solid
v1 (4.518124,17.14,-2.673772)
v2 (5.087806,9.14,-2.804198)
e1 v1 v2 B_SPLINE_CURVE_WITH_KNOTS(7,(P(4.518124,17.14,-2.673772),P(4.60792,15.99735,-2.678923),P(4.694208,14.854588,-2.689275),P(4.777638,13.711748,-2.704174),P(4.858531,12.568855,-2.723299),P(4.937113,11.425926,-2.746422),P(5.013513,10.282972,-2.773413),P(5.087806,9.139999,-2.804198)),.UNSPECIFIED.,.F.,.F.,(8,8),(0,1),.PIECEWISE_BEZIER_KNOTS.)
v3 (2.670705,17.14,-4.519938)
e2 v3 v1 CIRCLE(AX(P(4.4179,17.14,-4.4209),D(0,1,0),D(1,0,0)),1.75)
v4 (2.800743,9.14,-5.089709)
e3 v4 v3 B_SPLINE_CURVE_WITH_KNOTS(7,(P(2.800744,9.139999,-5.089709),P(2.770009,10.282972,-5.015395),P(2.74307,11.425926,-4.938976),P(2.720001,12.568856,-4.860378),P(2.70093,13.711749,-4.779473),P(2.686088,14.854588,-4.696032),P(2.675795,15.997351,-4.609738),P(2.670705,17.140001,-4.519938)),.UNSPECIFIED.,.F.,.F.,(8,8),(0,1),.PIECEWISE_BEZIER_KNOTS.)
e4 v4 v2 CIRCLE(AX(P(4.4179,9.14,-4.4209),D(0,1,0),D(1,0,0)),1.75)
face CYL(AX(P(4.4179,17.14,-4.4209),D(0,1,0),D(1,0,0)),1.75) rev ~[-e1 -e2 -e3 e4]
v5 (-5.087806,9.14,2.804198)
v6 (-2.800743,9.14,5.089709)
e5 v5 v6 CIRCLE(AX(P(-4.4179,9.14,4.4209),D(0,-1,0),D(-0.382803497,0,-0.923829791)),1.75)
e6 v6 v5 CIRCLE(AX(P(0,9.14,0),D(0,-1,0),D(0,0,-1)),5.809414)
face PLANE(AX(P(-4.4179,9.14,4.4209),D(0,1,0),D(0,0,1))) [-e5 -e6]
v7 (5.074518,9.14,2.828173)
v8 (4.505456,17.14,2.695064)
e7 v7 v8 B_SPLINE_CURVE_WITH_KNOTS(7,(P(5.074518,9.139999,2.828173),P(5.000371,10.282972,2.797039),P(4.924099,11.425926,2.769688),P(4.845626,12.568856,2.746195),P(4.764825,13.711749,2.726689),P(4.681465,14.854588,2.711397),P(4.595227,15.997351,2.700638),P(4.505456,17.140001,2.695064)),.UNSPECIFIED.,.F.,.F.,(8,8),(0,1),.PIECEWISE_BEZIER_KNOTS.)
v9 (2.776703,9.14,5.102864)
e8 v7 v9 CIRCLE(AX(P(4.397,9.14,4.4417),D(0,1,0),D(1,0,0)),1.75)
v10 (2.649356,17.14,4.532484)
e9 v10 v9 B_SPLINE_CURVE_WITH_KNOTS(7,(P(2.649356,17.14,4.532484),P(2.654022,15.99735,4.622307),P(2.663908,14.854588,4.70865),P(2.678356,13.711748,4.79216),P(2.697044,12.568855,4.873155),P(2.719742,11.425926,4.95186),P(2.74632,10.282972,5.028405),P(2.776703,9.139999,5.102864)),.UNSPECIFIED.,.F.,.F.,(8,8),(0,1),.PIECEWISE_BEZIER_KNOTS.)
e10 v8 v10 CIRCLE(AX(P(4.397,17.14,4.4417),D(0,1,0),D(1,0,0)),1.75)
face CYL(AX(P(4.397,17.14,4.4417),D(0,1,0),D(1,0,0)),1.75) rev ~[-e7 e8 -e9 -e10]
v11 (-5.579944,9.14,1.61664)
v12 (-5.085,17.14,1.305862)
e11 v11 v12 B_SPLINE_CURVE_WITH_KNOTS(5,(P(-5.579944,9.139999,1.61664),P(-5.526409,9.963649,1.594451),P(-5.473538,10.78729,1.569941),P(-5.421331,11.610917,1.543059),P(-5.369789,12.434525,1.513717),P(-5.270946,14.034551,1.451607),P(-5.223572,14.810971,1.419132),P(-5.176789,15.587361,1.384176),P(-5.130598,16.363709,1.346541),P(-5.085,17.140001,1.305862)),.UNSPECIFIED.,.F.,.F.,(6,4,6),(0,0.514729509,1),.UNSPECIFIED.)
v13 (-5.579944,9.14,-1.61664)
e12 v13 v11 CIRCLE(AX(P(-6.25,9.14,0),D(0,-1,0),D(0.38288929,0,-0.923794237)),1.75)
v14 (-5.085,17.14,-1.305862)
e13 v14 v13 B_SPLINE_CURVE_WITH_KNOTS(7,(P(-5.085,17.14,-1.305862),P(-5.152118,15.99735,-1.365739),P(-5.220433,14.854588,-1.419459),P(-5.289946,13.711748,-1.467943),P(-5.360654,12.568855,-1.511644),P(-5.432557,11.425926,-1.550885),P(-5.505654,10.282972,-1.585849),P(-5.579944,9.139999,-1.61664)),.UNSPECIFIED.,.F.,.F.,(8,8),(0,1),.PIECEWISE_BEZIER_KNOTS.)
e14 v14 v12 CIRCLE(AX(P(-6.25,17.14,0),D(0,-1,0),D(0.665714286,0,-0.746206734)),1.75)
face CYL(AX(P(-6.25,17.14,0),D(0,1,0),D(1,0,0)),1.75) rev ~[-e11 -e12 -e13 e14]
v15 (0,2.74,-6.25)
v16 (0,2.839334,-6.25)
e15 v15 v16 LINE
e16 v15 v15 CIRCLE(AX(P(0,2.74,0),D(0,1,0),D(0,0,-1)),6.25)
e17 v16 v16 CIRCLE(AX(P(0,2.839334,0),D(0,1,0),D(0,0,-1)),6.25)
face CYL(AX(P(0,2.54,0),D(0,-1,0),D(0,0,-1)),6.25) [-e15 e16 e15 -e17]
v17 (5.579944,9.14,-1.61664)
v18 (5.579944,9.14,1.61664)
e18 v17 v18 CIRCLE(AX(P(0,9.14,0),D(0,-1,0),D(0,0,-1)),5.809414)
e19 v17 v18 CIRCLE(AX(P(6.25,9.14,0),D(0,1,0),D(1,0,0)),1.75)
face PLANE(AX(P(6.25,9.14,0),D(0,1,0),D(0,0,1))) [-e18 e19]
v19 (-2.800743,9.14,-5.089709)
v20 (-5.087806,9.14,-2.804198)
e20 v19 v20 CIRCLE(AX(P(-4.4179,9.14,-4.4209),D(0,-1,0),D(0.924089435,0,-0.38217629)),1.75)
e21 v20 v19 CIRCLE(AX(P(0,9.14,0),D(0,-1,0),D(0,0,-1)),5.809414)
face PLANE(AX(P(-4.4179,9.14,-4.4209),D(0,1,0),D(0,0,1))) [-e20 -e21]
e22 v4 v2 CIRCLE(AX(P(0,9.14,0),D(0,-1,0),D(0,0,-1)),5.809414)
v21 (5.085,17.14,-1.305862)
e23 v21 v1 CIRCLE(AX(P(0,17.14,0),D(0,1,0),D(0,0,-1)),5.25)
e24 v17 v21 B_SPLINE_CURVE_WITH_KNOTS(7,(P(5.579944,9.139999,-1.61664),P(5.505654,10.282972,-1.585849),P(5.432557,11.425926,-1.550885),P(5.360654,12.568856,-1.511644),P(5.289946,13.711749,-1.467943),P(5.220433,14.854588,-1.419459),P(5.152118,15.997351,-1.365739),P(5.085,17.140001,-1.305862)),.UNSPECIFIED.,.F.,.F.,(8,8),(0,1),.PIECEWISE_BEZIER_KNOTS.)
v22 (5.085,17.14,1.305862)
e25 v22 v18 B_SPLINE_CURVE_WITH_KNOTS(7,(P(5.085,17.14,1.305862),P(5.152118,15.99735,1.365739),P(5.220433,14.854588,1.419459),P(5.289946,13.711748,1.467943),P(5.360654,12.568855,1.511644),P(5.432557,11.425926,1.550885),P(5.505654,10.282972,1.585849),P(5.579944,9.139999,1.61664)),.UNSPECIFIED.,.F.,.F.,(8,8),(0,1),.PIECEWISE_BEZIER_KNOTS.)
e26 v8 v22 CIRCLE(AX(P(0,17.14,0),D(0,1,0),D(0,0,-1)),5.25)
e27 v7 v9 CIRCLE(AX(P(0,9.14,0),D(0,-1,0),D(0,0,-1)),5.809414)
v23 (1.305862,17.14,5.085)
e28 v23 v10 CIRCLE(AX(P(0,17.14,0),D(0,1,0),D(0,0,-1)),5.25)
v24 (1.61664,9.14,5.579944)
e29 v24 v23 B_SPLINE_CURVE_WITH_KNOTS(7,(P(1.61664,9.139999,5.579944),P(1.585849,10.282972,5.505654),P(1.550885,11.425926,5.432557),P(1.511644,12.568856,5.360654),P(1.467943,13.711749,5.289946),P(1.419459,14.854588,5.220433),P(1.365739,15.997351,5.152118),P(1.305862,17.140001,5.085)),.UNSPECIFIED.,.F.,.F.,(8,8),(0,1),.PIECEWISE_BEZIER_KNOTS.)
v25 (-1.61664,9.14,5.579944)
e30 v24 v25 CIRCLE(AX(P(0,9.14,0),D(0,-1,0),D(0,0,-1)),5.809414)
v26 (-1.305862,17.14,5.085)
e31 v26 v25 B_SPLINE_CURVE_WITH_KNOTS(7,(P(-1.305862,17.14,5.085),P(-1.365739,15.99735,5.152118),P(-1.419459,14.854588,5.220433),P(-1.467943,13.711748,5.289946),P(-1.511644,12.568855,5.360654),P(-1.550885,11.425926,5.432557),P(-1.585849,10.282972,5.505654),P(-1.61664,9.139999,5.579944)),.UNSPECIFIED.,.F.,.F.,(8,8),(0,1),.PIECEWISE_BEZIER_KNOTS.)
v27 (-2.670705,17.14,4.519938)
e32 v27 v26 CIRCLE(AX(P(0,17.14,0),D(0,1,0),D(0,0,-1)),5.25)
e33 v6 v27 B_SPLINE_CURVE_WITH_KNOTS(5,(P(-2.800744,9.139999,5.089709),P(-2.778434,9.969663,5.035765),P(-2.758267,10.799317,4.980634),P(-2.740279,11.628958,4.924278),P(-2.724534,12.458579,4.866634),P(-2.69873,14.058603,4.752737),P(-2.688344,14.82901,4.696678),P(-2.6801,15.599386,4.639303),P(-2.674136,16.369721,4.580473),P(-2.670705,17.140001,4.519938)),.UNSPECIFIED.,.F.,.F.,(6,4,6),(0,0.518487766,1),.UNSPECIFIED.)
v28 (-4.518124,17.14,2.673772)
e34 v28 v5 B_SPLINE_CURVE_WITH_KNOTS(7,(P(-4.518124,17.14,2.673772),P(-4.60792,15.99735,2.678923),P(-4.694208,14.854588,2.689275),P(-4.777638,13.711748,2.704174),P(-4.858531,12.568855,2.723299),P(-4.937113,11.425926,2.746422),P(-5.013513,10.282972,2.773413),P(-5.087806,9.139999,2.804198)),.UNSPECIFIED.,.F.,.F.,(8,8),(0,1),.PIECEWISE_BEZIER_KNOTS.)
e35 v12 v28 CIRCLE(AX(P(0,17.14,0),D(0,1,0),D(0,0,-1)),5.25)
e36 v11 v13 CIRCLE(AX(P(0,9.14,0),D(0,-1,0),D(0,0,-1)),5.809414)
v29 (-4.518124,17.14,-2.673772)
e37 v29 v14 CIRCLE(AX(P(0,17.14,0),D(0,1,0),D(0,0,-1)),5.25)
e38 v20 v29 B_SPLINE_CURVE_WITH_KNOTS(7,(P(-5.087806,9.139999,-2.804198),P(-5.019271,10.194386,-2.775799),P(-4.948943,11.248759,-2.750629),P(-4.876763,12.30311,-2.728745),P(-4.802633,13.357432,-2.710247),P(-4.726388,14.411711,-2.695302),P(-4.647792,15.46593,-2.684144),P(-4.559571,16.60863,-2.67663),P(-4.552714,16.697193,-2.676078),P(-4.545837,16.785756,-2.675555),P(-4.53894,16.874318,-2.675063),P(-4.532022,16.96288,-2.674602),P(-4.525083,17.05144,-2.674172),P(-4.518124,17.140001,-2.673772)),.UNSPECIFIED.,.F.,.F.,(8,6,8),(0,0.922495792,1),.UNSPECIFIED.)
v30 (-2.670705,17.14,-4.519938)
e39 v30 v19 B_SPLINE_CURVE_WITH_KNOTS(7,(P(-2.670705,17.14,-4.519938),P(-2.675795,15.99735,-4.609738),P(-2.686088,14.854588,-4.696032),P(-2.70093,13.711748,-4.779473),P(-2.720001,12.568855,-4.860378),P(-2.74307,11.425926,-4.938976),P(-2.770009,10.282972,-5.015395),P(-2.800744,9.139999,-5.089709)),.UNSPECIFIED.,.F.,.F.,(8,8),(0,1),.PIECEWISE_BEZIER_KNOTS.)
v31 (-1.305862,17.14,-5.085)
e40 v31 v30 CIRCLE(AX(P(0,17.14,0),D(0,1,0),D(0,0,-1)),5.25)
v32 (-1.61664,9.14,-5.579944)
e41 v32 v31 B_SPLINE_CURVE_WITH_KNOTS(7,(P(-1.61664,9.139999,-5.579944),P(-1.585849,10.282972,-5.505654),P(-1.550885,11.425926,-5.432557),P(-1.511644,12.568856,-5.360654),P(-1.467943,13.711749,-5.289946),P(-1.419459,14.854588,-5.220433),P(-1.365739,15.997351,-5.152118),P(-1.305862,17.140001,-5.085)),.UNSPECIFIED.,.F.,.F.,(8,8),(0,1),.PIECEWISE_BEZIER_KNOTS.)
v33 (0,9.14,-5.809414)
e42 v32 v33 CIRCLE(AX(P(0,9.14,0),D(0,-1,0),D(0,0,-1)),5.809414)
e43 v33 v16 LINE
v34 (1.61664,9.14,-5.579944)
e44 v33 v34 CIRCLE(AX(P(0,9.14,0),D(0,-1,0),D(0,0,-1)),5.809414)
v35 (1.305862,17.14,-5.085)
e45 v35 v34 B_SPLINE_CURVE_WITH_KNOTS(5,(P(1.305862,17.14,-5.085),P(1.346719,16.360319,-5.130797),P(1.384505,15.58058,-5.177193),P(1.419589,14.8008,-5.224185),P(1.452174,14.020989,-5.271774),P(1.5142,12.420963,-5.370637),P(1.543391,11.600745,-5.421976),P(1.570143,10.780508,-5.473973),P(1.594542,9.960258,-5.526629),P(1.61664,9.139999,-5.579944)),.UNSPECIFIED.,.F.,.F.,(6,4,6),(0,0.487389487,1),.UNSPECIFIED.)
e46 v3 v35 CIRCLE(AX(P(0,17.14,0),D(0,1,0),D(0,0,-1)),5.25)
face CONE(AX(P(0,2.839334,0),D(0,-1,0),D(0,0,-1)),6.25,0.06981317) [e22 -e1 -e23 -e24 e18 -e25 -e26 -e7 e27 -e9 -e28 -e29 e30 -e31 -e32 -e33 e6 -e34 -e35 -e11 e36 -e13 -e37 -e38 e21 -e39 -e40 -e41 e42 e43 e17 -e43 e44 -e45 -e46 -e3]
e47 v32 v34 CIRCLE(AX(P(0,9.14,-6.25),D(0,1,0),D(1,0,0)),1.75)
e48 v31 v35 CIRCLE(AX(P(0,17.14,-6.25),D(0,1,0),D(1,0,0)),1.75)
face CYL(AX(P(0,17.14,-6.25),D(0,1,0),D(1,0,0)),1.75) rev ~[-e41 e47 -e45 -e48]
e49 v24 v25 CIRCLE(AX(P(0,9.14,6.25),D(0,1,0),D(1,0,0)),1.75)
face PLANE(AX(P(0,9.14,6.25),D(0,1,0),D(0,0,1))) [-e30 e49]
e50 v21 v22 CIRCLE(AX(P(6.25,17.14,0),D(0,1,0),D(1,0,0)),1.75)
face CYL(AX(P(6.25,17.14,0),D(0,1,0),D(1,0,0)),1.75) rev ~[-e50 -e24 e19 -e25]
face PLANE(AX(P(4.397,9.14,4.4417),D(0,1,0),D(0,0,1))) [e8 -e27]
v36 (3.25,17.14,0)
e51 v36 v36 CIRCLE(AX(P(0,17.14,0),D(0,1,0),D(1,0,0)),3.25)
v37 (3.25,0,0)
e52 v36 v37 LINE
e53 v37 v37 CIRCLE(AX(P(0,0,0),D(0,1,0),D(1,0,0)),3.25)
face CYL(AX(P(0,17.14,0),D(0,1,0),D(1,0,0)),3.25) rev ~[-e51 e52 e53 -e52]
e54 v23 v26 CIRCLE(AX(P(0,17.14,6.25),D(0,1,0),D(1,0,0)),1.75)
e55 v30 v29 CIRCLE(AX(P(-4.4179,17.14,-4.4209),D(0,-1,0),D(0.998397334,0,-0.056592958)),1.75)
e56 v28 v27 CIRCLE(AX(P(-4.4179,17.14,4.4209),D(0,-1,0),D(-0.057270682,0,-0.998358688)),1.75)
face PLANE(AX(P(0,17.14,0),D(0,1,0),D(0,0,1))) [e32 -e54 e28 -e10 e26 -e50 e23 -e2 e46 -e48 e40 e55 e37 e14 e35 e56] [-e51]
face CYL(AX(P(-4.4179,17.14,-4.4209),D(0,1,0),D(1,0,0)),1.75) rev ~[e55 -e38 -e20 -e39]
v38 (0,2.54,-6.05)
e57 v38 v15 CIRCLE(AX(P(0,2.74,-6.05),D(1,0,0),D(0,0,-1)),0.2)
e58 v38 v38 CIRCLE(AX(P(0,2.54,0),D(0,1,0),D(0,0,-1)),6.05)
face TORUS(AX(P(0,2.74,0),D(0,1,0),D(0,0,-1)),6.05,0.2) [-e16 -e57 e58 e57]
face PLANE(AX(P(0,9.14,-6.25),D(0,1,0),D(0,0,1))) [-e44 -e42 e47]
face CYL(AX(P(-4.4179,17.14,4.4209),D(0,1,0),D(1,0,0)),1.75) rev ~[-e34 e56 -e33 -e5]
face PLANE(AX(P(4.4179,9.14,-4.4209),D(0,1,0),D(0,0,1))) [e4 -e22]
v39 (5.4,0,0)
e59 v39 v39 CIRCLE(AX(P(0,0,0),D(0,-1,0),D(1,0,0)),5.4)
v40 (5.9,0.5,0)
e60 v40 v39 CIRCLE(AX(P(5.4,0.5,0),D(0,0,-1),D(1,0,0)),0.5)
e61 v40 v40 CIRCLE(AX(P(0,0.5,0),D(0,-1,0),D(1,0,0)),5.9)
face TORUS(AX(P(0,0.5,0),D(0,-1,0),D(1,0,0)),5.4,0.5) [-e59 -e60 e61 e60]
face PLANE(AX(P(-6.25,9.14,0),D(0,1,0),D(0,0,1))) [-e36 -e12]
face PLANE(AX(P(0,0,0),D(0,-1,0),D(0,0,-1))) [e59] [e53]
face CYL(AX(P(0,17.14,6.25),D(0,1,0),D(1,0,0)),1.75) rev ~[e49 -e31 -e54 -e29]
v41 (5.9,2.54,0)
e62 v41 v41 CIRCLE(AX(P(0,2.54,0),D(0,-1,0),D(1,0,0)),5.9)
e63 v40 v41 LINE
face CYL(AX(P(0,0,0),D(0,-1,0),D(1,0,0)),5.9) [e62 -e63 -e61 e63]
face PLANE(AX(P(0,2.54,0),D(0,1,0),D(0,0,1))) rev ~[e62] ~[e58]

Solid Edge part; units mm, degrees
sketch "Sketch1" plane through (0, 0, 0) normal (0, -1, 0) x (1, 0, 0)
  circle A0 centre (0, 0) radius 5.9
extrude "Protrusion1" add sketch "Sketch1" against normal blind 2.54
sketch "Sketch2" plane through (0, 2.54, 0) normal (0, 1, 0) x (0, 0, -1)
  circle A0 centre (0, 0) radius 6.25
extrude "Ajout_matière_3" add sketch "Sketch2" along normal blind 14.6
fillet "Congé_1" radius 0.5 1 edges at (-5.9, 0, 0)
fillet "Congé_2" radius 0.2 1 edges at (0, 2.54, 6.25)
chamfer "Chanfrein_1" distance 1 angle 86 1 edges at (0, 17.14, 6.25) measured on face at (-4.0417, 17.14, -4.2917)
sketch "Sketch3" plane through (0, 17.14, 0) normal (0, 1, 0) x (1, 0, 0)
  circle A0 centre (0, 0) radius 3.25
extrude "Enlèvement_matière_1" cut sketch "Sketch3" against normal blind 26
sketch "Sketch4" plane through (0, 17.14, 0) normal (0, 1, 0) x (1, 0, 0)
  circle A0 centre (0, -6.25) radius 1.75
  circle A1 centre (-4.4179, -4.4209) radius 1.75
  circle A2 centre (-6.25, 0) radius 1.75
  circle A3 centre (-4.4179, 4.4209) radius 1.75
  circle A4 centre (0, 6.25) radius 1.75
  circle A5 centre (4.4179, 4.4209) radius 1.75
  circle A6 centre (6.25, 0) radius 1.75
  circle A7 centre (4.397, -4.4417) radius 1.75
  dimension "D1" = 3.5
extrude "Enlèvement_matière_3" cut sketch "Sketch4" against normal blind 8
